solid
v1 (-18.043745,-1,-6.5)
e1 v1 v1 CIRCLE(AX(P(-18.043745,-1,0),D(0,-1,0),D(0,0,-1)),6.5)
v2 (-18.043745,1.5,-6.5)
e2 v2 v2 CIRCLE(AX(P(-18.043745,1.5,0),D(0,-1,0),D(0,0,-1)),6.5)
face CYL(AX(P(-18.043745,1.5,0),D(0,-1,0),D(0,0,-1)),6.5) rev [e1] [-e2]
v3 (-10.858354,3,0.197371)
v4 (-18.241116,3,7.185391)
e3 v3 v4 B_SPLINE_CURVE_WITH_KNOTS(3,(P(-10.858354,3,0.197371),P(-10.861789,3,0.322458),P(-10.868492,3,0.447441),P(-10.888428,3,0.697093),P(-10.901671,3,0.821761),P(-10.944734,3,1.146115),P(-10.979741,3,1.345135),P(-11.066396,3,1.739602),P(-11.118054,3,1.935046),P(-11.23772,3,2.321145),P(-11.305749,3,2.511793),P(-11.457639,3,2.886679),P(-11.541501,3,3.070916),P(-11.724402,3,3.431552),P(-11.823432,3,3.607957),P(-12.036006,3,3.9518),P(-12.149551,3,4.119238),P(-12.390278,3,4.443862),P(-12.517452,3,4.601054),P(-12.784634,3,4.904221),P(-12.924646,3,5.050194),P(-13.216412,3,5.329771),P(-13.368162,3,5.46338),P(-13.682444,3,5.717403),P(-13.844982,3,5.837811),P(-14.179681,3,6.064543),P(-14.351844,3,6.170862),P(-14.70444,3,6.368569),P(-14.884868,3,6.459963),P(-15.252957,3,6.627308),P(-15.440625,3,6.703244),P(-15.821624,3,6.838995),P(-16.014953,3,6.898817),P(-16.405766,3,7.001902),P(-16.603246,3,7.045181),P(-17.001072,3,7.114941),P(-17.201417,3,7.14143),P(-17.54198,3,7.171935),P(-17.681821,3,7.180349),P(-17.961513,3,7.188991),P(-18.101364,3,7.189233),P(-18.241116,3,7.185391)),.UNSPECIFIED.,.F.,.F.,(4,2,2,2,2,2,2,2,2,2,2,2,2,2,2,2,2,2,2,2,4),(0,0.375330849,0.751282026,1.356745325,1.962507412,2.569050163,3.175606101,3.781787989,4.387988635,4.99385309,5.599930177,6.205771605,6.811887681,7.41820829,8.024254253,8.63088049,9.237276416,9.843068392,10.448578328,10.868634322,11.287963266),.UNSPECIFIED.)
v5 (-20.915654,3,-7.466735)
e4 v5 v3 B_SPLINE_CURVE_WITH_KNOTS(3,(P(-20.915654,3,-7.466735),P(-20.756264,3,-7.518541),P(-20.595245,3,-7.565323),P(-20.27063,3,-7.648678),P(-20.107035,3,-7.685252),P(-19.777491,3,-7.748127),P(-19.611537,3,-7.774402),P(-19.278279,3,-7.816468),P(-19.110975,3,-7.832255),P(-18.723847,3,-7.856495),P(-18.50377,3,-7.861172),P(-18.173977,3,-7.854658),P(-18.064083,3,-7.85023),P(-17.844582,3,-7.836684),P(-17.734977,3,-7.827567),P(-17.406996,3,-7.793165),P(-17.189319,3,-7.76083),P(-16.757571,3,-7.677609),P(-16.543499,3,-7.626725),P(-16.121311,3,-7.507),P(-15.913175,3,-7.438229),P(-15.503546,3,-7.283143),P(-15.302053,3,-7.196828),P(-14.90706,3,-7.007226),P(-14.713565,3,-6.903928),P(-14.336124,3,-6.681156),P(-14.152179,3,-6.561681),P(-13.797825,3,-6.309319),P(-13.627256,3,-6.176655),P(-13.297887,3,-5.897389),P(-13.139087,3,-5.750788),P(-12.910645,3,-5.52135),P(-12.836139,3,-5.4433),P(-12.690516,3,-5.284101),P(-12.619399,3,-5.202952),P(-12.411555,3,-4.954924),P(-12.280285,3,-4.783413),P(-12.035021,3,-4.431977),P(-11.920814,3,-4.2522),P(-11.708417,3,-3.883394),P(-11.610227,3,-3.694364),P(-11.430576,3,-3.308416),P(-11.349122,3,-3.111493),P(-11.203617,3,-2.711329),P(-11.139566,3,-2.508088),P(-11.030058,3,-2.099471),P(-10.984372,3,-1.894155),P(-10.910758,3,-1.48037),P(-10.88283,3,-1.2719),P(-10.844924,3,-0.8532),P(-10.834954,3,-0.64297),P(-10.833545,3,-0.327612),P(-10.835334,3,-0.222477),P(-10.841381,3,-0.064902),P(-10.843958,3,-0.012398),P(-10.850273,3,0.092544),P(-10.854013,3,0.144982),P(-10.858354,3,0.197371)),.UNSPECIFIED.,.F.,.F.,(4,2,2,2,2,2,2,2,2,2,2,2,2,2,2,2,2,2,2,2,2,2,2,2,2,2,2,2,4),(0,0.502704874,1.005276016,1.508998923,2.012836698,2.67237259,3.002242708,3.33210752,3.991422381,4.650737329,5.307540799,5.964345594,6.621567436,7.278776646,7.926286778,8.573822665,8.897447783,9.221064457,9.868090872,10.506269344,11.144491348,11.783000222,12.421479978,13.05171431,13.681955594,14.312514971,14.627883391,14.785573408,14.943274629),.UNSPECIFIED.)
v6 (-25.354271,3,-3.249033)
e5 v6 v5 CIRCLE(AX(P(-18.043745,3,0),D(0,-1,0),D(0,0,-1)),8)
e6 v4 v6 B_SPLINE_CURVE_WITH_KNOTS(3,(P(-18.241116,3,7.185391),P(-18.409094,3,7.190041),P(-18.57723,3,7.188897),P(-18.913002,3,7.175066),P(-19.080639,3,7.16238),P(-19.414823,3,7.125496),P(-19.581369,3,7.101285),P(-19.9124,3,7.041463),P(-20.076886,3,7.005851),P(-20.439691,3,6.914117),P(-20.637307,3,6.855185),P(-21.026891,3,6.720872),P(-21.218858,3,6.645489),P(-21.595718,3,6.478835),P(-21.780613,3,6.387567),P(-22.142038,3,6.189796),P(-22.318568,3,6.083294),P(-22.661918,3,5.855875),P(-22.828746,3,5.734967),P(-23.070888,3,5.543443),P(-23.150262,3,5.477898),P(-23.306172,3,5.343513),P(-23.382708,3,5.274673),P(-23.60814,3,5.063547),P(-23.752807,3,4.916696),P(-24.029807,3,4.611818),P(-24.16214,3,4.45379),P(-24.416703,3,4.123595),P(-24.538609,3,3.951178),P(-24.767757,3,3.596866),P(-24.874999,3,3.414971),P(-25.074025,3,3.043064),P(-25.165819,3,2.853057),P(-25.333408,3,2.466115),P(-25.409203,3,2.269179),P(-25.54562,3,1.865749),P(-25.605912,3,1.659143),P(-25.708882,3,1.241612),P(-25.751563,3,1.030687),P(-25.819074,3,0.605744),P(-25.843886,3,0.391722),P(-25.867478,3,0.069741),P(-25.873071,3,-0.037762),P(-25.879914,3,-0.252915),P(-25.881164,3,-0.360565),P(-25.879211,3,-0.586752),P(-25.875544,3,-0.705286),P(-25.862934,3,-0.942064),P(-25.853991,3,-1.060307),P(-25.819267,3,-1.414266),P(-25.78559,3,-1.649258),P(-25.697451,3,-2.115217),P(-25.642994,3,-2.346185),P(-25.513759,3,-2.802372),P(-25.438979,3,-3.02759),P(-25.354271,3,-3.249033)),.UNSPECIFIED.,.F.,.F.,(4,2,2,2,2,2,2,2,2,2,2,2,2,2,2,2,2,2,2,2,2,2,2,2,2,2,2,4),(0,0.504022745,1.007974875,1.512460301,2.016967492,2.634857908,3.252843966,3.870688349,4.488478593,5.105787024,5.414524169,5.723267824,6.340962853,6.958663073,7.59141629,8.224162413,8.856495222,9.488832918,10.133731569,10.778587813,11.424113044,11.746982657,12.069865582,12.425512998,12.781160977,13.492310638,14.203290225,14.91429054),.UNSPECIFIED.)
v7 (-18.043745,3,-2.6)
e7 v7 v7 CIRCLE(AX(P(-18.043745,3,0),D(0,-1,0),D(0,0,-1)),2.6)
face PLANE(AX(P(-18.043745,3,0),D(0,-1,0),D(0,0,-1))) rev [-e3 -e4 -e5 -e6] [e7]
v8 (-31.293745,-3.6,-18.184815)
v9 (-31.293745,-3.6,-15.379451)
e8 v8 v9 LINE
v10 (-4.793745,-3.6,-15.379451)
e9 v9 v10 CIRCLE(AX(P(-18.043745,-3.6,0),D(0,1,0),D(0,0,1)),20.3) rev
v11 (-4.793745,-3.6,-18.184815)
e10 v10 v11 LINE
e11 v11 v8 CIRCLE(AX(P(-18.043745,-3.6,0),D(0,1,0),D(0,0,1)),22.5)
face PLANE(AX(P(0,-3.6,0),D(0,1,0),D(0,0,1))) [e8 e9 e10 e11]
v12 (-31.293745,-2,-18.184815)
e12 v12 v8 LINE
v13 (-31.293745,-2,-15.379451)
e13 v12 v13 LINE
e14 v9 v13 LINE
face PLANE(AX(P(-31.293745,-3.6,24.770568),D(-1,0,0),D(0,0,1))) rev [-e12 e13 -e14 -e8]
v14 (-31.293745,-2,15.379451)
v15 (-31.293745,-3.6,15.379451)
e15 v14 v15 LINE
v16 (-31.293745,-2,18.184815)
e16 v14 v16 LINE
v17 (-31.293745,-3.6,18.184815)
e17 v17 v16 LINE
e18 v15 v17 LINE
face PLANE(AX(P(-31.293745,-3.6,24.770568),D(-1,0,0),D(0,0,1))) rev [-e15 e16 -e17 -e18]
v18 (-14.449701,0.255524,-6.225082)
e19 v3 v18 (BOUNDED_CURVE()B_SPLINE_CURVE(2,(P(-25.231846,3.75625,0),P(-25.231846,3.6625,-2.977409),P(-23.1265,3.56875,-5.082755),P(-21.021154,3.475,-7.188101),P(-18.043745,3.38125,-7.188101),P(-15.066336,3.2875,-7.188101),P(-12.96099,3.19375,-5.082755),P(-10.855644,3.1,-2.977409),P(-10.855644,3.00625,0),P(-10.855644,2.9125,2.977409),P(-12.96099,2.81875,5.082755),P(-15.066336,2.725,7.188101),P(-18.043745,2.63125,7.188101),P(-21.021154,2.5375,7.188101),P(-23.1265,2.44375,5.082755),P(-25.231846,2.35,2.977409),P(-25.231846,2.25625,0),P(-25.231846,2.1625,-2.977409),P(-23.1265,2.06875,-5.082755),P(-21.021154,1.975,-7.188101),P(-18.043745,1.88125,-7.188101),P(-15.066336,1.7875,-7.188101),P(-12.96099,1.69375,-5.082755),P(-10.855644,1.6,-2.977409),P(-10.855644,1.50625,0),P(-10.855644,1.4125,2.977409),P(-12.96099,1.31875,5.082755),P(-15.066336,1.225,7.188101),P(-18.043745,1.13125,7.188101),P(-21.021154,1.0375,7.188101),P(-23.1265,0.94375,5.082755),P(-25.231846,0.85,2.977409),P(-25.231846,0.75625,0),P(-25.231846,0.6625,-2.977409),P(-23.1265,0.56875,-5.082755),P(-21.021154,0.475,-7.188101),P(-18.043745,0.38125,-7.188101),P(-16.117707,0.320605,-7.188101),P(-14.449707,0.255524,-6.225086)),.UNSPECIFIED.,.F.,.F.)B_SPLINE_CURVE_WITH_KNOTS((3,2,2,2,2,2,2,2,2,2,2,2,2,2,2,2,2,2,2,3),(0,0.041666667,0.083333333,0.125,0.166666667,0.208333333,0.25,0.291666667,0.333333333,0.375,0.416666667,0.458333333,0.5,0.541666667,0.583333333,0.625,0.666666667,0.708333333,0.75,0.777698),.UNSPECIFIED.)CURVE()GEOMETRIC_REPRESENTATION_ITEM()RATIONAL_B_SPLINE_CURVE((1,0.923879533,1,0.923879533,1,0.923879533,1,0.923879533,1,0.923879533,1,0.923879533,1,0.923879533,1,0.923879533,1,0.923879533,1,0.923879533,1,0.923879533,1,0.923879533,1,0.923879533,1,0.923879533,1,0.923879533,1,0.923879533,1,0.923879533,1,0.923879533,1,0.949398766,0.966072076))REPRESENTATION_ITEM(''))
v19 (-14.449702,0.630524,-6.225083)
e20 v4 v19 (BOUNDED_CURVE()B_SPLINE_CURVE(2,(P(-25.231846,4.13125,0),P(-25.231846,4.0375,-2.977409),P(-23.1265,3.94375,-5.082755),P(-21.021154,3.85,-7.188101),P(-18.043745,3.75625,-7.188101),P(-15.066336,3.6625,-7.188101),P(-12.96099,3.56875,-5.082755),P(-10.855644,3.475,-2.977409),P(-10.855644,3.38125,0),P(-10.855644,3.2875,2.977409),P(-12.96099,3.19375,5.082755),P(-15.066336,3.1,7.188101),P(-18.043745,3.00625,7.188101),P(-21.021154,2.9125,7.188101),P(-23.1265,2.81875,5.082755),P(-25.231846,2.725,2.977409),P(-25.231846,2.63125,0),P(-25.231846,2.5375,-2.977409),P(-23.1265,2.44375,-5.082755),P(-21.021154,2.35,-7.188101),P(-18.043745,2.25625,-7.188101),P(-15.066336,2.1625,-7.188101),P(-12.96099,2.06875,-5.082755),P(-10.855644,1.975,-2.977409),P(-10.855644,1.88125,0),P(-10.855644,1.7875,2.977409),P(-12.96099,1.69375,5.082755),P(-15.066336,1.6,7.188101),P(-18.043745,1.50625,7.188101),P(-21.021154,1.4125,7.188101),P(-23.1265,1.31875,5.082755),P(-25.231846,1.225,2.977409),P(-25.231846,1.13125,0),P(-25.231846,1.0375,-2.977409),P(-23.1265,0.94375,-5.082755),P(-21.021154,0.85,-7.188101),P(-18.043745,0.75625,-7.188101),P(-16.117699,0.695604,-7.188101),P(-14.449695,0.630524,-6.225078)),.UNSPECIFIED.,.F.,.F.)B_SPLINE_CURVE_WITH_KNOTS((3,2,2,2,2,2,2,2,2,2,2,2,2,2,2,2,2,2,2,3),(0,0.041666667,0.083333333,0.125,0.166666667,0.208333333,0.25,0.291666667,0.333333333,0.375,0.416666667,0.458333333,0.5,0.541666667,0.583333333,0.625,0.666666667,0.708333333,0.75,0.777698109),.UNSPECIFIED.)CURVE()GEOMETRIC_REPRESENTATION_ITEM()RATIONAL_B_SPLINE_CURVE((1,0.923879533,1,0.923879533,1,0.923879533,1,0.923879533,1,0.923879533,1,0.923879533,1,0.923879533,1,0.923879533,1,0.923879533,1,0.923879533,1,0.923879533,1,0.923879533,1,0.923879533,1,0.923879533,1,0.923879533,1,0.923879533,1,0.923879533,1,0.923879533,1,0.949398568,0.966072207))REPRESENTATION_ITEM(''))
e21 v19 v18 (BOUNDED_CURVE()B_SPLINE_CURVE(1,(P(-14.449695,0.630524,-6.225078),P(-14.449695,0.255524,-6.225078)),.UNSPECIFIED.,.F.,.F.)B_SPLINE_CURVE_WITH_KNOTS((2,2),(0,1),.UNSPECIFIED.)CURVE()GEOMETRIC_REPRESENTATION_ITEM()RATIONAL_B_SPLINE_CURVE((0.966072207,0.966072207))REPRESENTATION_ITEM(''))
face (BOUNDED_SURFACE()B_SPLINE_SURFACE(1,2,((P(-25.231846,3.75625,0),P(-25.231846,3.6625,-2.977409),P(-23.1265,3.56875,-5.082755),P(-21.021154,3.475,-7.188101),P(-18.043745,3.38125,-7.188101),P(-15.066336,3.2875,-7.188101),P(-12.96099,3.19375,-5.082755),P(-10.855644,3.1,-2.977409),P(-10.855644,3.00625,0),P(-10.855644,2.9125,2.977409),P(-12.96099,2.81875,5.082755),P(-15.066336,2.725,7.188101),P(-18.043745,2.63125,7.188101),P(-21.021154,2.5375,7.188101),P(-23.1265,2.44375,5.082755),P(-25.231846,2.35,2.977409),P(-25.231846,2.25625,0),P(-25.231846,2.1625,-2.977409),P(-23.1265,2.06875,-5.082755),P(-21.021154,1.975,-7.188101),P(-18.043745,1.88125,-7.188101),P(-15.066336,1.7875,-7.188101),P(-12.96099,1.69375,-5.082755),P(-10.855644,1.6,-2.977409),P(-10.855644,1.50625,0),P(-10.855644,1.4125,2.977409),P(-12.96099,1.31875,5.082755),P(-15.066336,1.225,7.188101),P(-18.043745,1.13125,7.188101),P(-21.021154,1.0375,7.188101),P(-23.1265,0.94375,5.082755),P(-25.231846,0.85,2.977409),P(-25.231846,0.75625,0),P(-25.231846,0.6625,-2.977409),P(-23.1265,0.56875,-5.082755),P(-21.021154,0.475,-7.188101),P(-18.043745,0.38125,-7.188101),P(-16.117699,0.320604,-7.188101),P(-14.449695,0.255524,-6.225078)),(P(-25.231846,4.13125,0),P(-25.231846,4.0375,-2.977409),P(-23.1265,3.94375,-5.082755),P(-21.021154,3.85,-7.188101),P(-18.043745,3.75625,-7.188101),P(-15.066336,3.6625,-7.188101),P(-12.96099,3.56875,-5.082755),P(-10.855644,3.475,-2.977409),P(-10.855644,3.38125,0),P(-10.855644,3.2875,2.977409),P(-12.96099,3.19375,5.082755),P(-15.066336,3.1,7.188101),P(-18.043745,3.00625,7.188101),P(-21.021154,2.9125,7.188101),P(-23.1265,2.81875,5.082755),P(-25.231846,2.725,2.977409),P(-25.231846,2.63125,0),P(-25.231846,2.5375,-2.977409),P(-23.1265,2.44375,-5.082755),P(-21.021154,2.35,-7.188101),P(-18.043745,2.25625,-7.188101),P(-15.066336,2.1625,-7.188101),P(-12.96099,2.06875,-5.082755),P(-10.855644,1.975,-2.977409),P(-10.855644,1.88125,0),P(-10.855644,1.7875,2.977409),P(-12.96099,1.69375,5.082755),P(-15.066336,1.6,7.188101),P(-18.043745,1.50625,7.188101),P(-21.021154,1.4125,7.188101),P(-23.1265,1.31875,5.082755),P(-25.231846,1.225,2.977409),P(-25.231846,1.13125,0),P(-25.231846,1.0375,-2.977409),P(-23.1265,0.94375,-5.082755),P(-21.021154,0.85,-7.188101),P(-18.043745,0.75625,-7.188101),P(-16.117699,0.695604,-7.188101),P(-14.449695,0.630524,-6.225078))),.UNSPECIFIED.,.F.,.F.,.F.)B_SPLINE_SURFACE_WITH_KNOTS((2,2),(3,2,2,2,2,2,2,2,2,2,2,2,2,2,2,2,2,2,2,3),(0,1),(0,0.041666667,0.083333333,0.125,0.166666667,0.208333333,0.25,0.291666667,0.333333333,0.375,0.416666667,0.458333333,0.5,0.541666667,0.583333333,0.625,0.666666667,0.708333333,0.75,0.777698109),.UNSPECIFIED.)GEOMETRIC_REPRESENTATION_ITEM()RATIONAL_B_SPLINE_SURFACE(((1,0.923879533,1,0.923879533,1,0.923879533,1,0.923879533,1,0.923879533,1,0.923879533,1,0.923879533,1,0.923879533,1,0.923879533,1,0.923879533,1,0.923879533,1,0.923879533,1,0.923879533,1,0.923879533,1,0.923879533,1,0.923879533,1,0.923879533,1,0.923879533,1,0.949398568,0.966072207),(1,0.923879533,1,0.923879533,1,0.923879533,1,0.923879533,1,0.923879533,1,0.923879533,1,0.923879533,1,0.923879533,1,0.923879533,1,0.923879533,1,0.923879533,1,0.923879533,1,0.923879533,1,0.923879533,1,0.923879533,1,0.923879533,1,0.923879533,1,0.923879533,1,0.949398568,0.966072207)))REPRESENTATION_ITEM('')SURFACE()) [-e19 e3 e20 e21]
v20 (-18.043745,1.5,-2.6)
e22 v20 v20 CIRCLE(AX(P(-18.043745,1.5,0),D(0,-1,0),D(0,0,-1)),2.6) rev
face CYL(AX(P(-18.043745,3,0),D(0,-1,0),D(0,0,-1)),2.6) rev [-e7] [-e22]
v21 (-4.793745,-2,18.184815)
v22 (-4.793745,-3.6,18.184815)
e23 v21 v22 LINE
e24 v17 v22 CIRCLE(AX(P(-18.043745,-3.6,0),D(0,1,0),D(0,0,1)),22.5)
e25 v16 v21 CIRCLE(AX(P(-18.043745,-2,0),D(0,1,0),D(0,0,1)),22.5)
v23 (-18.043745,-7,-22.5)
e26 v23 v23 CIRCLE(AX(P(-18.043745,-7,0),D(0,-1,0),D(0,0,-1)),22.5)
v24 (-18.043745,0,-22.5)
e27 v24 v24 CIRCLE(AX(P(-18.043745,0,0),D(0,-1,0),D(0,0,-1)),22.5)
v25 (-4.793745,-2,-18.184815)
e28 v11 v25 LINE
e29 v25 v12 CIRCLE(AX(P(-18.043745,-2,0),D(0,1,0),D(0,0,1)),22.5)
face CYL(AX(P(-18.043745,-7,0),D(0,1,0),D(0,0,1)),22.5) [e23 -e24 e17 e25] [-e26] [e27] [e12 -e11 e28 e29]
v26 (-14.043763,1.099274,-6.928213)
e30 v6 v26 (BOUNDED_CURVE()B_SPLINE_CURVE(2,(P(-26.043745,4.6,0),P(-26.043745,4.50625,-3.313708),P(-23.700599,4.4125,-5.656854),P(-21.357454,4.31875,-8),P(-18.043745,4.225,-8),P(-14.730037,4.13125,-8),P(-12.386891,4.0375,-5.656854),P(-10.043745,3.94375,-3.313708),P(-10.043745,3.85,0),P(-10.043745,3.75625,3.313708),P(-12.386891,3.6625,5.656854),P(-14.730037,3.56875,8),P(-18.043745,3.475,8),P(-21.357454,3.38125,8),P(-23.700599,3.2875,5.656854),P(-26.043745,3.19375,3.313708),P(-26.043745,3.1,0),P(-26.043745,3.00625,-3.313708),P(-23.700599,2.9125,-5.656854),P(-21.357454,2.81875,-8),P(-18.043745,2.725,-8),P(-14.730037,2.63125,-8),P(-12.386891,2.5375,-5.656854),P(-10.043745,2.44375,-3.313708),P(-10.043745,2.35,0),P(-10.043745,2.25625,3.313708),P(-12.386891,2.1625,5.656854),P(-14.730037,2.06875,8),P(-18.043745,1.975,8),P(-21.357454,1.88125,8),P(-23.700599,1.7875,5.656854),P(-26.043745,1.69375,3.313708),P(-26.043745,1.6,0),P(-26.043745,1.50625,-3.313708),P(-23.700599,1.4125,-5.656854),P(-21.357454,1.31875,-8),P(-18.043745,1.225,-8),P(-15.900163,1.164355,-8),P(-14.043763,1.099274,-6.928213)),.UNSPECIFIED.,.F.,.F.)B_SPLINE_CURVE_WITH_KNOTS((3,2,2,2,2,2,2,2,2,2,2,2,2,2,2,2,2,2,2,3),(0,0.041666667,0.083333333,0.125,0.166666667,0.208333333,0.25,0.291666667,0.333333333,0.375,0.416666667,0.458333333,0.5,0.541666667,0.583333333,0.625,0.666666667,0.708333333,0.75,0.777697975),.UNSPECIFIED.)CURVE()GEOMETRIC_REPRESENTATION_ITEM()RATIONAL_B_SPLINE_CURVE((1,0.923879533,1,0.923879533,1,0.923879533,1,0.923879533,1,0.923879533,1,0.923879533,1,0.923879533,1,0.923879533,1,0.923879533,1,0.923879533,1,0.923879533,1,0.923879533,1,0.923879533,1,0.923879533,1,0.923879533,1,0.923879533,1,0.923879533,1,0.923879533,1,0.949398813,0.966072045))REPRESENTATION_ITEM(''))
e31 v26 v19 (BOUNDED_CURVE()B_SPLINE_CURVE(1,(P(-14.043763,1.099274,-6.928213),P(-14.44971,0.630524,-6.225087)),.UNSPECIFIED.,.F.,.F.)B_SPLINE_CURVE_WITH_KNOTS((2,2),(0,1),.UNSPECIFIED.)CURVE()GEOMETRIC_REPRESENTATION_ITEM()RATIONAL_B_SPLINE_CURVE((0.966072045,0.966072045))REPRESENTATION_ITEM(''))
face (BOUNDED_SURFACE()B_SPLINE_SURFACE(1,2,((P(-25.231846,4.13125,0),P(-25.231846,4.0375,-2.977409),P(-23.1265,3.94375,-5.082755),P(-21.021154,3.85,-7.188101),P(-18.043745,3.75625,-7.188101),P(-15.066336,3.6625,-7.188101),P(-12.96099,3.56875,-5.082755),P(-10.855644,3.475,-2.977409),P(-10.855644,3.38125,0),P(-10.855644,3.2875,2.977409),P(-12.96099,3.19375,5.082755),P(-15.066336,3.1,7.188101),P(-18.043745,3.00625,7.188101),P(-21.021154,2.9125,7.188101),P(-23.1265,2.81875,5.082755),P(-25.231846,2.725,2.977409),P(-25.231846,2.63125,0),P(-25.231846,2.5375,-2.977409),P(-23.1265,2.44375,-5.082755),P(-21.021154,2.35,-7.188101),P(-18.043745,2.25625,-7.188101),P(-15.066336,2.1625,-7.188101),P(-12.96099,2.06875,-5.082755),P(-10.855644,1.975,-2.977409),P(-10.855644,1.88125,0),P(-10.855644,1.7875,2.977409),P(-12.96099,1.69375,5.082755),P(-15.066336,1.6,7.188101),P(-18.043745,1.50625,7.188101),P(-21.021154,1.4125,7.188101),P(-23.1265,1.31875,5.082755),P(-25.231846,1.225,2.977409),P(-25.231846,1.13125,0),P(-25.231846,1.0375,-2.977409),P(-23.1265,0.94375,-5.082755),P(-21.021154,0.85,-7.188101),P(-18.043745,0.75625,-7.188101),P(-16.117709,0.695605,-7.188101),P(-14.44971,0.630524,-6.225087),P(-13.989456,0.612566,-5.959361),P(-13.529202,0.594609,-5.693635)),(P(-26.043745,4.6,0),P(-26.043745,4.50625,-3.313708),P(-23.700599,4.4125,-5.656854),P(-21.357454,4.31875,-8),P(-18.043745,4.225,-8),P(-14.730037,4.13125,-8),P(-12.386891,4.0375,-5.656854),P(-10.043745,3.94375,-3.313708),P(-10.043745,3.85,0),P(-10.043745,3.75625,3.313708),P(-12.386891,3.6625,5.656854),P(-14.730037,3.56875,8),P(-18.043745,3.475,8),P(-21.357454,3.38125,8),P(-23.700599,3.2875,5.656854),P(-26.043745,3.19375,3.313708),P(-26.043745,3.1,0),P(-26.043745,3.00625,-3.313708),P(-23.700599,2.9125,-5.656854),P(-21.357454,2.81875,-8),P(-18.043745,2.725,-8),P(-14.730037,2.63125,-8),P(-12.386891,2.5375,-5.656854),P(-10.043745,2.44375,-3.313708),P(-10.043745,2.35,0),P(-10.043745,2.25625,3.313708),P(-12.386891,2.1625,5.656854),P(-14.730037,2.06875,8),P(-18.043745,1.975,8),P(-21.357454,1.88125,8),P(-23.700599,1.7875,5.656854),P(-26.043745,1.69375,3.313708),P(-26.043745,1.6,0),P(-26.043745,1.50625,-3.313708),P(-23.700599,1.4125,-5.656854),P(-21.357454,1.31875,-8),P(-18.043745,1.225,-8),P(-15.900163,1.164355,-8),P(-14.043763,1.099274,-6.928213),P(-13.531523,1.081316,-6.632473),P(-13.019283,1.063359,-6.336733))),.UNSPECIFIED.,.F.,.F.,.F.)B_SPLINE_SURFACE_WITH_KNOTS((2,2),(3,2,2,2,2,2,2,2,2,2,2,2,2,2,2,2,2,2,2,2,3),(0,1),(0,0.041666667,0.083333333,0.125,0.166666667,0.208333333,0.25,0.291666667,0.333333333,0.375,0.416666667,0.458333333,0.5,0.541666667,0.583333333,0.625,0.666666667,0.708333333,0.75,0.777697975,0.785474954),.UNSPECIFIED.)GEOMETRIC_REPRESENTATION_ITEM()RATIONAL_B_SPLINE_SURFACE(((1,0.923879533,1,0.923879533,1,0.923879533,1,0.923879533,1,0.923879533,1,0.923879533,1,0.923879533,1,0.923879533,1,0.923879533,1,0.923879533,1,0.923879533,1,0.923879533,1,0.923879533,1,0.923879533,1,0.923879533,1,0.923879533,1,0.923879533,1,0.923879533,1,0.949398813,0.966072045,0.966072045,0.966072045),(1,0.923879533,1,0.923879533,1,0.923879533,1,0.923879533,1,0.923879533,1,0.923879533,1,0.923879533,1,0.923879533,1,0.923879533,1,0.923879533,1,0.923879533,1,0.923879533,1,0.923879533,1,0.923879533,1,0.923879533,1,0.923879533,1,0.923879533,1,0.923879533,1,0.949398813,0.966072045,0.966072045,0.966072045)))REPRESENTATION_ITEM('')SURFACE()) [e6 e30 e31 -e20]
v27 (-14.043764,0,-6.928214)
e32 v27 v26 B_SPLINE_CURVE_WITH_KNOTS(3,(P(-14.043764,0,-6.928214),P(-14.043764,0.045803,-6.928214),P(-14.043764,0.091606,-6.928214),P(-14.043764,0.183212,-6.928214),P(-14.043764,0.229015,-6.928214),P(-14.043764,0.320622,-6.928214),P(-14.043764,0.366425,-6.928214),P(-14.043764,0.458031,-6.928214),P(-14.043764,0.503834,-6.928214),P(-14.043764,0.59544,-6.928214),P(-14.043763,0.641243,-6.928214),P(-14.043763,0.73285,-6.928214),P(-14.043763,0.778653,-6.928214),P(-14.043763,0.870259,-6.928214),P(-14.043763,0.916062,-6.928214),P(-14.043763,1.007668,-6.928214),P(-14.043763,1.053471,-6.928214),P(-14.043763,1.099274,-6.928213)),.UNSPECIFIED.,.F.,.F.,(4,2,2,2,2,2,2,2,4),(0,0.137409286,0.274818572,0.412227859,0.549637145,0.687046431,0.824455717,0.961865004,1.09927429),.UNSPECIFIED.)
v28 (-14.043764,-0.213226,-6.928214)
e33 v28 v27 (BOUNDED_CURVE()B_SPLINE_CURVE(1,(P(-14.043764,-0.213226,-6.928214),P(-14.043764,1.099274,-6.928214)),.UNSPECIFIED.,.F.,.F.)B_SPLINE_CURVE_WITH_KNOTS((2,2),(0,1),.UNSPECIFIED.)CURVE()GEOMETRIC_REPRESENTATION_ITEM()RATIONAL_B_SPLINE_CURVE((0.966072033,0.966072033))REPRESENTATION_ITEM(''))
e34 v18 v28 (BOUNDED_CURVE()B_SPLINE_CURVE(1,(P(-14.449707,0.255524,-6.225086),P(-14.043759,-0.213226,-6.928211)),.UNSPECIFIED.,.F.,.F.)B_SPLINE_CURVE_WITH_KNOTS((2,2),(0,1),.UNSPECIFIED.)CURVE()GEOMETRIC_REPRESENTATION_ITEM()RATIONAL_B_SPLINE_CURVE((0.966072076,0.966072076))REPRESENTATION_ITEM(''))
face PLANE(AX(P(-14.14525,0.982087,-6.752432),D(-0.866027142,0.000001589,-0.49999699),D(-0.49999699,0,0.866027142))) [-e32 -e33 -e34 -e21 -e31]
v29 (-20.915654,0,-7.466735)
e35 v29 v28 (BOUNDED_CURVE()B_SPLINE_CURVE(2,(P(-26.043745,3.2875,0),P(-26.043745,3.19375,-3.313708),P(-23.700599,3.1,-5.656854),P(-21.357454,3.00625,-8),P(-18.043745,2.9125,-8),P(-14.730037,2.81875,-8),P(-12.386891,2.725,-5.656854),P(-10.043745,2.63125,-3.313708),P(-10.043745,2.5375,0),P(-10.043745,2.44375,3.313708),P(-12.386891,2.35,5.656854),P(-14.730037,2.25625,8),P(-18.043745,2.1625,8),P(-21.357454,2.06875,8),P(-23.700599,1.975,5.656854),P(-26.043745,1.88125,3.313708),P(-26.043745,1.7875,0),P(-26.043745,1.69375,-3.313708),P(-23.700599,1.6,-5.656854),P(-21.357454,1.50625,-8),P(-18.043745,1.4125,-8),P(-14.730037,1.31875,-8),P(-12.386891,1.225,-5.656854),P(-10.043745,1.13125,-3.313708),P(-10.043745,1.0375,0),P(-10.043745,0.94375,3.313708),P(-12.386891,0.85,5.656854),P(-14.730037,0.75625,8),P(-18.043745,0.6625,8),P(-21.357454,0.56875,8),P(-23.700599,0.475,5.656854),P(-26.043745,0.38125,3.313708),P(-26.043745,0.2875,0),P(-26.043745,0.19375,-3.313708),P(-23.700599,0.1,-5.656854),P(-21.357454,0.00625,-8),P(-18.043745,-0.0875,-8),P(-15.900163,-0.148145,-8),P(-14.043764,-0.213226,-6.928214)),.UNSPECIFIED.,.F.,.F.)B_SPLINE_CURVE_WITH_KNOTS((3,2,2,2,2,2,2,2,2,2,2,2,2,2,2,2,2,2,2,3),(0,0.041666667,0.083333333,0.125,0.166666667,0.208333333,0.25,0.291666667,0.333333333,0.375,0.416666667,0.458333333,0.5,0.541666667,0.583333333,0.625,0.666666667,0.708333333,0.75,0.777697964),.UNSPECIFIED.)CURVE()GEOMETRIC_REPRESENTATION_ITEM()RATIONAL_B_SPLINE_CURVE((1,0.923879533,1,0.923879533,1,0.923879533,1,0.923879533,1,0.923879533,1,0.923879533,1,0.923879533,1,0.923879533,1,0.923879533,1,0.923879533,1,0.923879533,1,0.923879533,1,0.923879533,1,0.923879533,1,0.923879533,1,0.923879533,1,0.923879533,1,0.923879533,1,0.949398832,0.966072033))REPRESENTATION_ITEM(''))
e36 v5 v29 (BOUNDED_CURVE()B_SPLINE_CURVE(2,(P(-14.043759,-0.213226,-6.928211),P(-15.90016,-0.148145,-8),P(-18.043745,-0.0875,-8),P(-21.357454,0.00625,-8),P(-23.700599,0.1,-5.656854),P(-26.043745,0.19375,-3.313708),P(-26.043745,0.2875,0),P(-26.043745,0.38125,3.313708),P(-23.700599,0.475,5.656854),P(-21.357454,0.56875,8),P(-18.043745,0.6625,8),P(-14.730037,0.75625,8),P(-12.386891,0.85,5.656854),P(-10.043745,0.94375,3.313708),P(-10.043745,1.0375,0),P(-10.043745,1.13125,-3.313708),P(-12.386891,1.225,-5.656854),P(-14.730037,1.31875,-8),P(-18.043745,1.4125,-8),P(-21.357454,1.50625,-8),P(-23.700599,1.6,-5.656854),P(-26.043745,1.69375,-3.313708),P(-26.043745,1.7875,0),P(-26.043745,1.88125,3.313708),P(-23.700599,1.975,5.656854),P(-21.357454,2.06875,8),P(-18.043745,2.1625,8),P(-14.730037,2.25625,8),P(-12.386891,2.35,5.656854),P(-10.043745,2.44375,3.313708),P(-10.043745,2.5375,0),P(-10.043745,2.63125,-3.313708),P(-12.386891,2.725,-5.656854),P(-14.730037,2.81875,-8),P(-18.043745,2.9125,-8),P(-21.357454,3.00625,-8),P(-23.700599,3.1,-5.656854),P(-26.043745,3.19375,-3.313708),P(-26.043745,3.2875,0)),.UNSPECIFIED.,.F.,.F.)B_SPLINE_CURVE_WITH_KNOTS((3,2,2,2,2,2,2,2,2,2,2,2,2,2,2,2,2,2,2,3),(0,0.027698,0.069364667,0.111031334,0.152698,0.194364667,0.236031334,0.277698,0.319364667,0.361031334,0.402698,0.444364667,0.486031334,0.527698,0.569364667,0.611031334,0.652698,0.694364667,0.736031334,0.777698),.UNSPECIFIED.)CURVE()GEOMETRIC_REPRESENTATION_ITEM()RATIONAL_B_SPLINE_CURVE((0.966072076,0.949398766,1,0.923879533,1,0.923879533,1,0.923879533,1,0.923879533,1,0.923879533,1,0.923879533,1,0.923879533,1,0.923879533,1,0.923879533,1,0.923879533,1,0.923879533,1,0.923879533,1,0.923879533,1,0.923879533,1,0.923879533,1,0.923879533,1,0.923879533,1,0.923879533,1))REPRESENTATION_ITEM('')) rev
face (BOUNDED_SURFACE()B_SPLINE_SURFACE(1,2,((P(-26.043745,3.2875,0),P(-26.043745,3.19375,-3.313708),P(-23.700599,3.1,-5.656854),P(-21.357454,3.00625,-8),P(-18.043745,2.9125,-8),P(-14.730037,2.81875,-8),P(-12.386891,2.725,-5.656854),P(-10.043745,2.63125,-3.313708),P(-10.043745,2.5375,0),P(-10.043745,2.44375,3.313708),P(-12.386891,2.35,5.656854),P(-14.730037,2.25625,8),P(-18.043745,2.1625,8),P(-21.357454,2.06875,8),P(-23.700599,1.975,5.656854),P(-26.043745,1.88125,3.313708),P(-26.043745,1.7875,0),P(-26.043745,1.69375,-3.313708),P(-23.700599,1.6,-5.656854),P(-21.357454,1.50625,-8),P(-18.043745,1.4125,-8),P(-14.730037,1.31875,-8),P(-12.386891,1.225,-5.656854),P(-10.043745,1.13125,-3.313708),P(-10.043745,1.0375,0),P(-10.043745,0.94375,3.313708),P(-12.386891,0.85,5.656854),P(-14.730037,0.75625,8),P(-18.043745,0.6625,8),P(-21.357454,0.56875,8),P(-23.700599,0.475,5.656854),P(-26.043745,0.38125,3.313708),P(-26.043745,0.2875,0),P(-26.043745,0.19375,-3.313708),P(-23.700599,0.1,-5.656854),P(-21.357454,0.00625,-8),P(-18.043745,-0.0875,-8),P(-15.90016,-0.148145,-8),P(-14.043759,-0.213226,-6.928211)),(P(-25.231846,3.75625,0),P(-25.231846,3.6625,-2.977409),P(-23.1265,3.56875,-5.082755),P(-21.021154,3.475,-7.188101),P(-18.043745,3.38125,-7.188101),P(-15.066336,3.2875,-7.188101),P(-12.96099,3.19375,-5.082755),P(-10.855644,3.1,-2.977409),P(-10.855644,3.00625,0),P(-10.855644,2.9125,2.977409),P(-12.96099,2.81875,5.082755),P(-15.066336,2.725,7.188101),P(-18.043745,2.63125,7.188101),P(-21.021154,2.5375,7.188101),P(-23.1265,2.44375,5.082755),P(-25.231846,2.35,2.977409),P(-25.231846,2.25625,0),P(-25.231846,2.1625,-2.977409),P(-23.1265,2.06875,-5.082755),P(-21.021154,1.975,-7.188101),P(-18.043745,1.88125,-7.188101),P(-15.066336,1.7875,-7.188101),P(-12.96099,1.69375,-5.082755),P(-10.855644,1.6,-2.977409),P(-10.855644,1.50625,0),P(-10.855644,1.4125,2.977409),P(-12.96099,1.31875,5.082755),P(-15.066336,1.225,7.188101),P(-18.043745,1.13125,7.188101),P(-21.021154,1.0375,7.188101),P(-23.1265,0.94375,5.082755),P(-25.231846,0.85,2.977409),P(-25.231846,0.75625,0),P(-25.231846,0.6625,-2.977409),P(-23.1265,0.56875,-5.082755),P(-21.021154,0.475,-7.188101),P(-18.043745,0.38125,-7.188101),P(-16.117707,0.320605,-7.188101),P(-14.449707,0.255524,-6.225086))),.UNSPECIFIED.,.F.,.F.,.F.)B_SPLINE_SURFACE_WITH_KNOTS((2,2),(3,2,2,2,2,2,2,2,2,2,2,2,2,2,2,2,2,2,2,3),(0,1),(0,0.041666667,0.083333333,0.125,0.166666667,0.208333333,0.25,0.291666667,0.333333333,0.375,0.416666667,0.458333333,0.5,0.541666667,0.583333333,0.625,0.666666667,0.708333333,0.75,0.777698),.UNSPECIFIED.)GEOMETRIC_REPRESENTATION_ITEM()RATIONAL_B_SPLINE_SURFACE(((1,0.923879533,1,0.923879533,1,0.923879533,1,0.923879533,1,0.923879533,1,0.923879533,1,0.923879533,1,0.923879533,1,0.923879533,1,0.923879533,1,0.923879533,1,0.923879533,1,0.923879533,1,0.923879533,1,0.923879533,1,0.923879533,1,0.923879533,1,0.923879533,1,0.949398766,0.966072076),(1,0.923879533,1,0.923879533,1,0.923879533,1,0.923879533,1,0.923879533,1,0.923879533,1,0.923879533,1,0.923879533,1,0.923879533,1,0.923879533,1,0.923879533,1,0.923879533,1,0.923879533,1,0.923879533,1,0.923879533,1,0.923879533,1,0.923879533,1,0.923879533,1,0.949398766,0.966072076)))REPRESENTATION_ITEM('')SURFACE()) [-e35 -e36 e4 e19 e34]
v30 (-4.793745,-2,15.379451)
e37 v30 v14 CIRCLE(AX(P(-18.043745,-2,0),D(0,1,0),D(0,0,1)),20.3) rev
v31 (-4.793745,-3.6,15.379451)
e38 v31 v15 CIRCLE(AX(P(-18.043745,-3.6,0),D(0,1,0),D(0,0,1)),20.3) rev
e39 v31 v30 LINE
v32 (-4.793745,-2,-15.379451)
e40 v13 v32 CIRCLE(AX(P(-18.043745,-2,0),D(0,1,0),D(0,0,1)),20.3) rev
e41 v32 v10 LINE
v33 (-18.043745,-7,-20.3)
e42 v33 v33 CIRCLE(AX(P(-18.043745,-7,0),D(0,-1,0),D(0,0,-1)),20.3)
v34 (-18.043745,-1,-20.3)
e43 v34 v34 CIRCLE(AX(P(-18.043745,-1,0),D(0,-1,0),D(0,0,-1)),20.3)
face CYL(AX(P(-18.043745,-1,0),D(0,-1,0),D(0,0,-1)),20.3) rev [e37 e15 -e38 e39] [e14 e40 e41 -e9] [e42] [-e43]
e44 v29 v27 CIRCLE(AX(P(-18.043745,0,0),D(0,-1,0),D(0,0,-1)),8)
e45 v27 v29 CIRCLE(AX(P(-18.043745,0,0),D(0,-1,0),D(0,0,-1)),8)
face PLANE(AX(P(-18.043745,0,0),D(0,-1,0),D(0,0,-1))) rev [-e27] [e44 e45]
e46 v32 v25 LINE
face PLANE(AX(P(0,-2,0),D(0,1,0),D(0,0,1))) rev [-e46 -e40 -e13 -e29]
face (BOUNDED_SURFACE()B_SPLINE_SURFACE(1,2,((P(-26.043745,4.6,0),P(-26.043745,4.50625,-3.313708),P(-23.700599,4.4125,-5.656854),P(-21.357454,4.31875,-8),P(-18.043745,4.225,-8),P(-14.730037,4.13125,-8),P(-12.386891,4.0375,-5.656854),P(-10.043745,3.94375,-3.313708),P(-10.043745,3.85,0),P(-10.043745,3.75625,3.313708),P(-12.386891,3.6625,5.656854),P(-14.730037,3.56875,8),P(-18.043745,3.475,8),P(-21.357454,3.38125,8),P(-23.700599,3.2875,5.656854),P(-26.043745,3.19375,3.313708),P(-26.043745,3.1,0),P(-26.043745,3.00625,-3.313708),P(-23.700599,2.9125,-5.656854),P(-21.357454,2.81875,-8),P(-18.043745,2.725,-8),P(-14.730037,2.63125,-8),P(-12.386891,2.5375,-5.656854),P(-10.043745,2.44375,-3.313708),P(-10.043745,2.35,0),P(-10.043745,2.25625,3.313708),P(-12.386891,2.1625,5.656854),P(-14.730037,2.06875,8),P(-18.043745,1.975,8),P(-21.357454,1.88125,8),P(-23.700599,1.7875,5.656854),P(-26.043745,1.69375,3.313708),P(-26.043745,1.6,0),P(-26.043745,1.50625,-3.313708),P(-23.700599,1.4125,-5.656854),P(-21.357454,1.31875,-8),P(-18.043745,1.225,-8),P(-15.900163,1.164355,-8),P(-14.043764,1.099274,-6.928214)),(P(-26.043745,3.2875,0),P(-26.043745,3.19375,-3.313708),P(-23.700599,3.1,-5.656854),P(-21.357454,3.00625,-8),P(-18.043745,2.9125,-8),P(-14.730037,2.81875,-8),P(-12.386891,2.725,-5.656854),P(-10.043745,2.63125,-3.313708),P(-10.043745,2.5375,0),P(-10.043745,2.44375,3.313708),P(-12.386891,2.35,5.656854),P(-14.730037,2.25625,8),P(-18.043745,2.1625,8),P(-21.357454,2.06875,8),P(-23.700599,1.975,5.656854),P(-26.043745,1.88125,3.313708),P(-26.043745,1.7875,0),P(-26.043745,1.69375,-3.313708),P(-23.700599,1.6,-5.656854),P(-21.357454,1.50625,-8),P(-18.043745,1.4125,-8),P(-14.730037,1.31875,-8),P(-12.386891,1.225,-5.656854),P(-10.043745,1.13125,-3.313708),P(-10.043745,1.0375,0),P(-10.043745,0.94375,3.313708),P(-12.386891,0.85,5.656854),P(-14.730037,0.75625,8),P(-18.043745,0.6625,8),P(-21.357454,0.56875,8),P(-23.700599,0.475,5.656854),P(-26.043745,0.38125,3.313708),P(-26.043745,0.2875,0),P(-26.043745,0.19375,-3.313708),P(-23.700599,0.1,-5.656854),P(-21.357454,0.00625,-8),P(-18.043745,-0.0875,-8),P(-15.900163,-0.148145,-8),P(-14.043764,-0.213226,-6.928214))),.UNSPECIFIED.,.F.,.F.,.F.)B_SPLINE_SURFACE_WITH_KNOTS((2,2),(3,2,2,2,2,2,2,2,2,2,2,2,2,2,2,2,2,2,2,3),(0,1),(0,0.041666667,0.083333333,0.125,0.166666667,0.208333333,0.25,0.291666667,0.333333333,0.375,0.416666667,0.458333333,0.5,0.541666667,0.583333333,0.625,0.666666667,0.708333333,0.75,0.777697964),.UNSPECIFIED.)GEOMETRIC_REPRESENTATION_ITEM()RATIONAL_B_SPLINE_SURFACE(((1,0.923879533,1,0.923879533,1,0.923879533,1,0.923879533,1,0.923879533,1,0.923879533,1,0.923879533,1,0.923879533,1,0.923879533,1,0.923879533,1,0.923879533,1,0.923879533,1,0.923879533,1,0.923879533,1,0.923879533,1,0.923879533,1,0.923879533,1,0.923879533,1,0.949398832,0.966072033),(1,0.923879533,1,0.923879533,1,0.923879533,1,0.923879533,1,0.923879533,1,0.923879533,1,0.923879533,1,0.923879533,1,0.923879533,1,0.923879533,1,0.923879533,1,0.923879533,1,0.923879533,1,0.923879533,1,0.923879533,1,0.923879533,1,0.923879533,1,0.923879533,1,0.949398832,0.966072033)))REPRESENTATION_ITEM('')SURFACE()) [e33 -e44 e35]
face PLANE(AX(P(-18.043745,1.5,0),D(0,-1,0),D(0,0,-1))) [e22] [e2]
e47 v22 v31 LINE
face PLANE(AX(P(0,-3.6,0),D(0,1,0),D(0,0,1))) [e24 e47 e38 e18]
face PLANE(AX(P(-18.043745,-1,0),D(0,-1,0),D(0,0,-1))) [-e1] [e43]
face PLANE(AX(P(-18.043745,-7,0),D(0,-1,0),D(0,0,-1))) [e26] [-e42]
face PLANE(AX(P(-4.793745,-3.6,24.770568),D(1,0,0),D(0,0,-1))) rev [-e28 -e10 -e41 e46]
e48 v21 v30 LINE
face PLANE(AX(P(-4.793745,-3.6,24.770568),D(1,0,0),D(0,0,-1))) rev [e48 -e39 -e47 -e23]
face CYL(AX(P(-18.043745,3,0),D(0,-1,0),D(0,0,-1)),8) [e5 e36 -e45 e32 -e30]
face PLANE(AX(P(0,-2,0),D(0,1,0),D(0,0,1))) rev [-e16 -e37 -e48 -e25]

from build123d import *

# Parameters (mm, degrees)
SKIZZE1_R                            = 5
ZYLINDER_DEPTH                       = 2.2
SCHNITT_LINEAR_AUSTRAGEN1_DEPTH      = 10
SCHNITT_LINEAR_AUSTRAGEN1_DEPTH_BACK = 5
SKIZZE4_R                            = 4.5
SKIZZE6_R                            = 22.5
FASSUNG_OBJEKTTR_GERGEWINDE_DEPTH    = 7
SKIZZE11_R                           = 20.3
BOHRUNG_F_R_INNENGEWINDE_DEPTH       = 6
SKIZZE13_R                           = 8
ZYLINDER_F_R_GEWINDE_DEPTH           = 3
SKIZZE16_R                           = 2.6
LINSENEINSATZ_DEPTH                  = 10
GEWINDE1_PITCH                       = 1.5
SKIZZE17_W                           = 26.5
SKIZZE17_H                           = 49.541135346
SCHLITZ_F_R_SLIDE_DEPTH              = 1.6
SKIZZE21_R                           = 6.5
FILTEREINSATZ_DEPTH                  = 2.5


with BuildPart() as part:
    # Skizze1 → Zylinder (new body)
    with BuildSketch(Plane(origin=(0, 0, 0), x_dir=(1, 0, 0), z_dir=(0, 1, 0))):
        with Locations(Location((-18.043745097, 0, 0), (0, 0, 270))):
            Circle(SKIZZE1_R)
    extrude(amount=ZYLINDER_DEPTH)

    # Skizze4 → Schnitt-Linear austragen1 (cut, two sides: drawn at the far end of the back side and taken through both)
    with BuildSketch(Plane(origin=(0, 2.2, 0), x_dir=(1, 0, 0), z_dir=(0, 1, 0)).offset(-SCHNITT_LINEAR_AUSTRAGEN1_DEPTH_BACK)):
        with Locations(Location((-18.043745097, 0, 0), (0, 0, 270))):
            Circle(SKIZZE4_R)
    extrude(amount=SCHNITT_LINEAR_AUSTRAGEN1_DEPTH + SCHNITT_LINEAR_AUSTRAGEN1_DEPTH_BACK, mode=Mode.SUBTRACT)

    # Skizze6 → Fassung Objektträgergewinde (add)
    with BuildSketch(Plane(origin=(0, 0, 0), x_dir=(-1, 0, 0), z_dir=(0, -1, 0))):
        with Locations(Location((18.043745097, 0, 0), (0, 0, 90))):
            Circle(SKIZZE6_R)
    extrude(amount=FASSUNG_OBJEKTTR_GERGEWINDE_DEPTH)

    # Skizze11 → Bohrung für Innengewinde (cut)
    with BuildSketch(Plane(origin=(0, -7, 0), x_dir=(-1, 0, 0), z_dir=(0, -1, 0))):
        with Locations(Location((18.043745097, 0, 0), (0, 0, 90))):
            Circle(SKIZZE11_R)
    extrude(amount=-BOHRUNG_F_R_INNENGEWINDE_DEPTH, mode=Mode.SUBTRACT)

    # Skizze13 → Zylinder für Gewinde (add)
    with BuildSketch(Plane(origin=(0, 0, 0), x_dir=(-1, 0, 0), z_dir=(0, -1, 0))):
        with Locations(Location((18.043745097, 0, 0), (0, 0, 90))):
            Circle(SKIZZE13_R)
    extrude(amount=-ZYLINDER_F_R_GEWINDE_DEPTH)

    # Skizze16 → Linseneinsatz (cut)
    with BuildSketch(Plane(origin=(0, -7, 0), x_dir=(-1, 0, 0), z_dir=(0, -1, 0))):
        with Locations(Location((18.043745097, 0, 0), (0, 0, 90))):
            Circle(SKIZZE16_R)
    extrude(amount=-LINSENEINSATZ_DEPTH, mode=Mode.SUBTRACT)

    # Gewinde1: the profile of Gewindeprofil1 profile screwed along a right-hand helix of 2.333333 turns, 8 arcs to a turn; built about Z, then put on its axis
    gewinde1_z = Axis((0, 0, 0), (0, 0, 1))
    gewinde1_corners = [(8.0003, 0, -0.000173205), (8.0003, 0, 1.312673201), (7.188101187, 0, 0.843749998), (7.188101187, 0, 0.468749998)]
    with BuildLine(mode=Mode.PRIVATE) as gewinde1_profile:
        Line(gewinde1_corners[0], gewinde1_corners[1])
        Line(gewinde1_corners[1], gewinde1_corners[2])
        Line(gewinde1_corners[2], gewinde1_corners[3])
        Line(gewinde1_corners[3], gewinde1_corners[0])
    gewinde1_cap = Face(gewinde1_profile.wire())
    gewinde1_turn_angles = [0, 22.5, 45, 67.5, 90, 112.5, 135, 157.5, 180, 202.5, 225, 247.5, 270, 292.5, 315, 337.5, 360]
    gewinde1_turn_weights = [1, 0.9238795325112867, 1, 0.9238795325112867, 1, 0.9238795325112867, 1, 0.9238795325112867, 1, 0.9238795325112867, 1, 0.9238795325112867, 1, 0.9238795325112867, 1, 0.9238795325112867, 1]
    gewinde1_turn_rails = [Edge.make_bspline([Vector(p[0], p[1], 0).rotate(gewinde1_z, gewinde1_turn_angles[k]) / gewinde1_turn_weights[k] + Vector(0, 0, p[2] + GEWINDE1_PITCH * gewinde1_turn_angles[k] / 360) for k in range(17)], [0, 0, 0, 1, 1, 2, 2, 3, 3, 4, 4, 5, 5, 6, 6, 7, 7, 8, 8, 8], 2, gewinde1_turn_weights) for p in gewinde1_corners]
    gewinde1_turn_sides = [Face.make_surface_from_curves(gewinde1_turn_rails[p[0]], gewinde1_turn_rails[p[1]]) for p in [(0, 1), (1, 2), (2, 3), (3, 0)]]
    gewinde1_last_angles = [720, 742.5, 765, 787.5, 810, 825, 840]
    gewinde1_last_weights = [1, 0.9238795325112867, 1, 0.9238795325112867, 1, 0.9659258262890685, 1]
    gewinde1_last_rails = [Edge.make_bspline([Vector(p[0], p[1], 0).rotate(gewinde1_z, gewinde1_last_angles[k]) / gewinde1_last_weights[k] + Vector(0, 0, p[2] + GEWINDE1_PITCH * gewinde1_last_angles[k] / 360) for k in range(7)], [0, 0, 0, 1, 1, 2, 2, 3, 3, 3], 2, gewinde1_last_weights) for p in gewinde1_corners]
    gewinde1_last_sides = [Face.make_surface_from_curves(gewinde1_last_rails[p[0]], gewinde1_last_rails[p[1]]) for p in [(0, 1), (1, 2), (2, 3), (3, 0)]]
    gewinde1 = Plane(origin=(-18.043745097, 4.6, 0), x_dir=(-1, 0, 0), z_dir=(0, -1, 0)) * Solid(Shell([*[p.moved(Location((0, 0, GEWINDE1_PITCH * i))) for i in range(2) for p in gewinde1_turn_sides], *gewinde1_last_sides, gewinde1_cap, gewinde1_cap.rotate(gewinde1_z, 840).moved(Location((0, 0, GEWINDE1_PITCH * 840 / 360)))]))
    add(gewinde1, mode=Mode.SUBTRACT)

    # Skizze17 → Schlitz für Slide (cut)
    with BuildSketch(Plane(origin=(0, -2, 0), x_dir=(1, 0, 0), z_dir=(0, 1, 0))):
        with Locations((-18.043745097, 0)):
            Rectangle(SKIZZE17_W, SKIZZE17_H)
    extrude(amount=-SCHLITZ_F_R_SLIDE_DEPTH, mode=Mode.SUBTRACT)

    # Skizze21 → Filtereinsatz (cut)
    with BuildSketch(Plane(origin=(0, -1, 0), x_dir=(-1, 0, 0), z_dir=(0, -1, 0))):
        with Locations(Location((18.043745097, 0, 0), (0, 0, 90))):
            Circle(SKIZZE21_R)
    extrude(amount=-FILTEREINSATZ_DEPTH, mode=Mode.SUBTRACT)


solid = part.part
